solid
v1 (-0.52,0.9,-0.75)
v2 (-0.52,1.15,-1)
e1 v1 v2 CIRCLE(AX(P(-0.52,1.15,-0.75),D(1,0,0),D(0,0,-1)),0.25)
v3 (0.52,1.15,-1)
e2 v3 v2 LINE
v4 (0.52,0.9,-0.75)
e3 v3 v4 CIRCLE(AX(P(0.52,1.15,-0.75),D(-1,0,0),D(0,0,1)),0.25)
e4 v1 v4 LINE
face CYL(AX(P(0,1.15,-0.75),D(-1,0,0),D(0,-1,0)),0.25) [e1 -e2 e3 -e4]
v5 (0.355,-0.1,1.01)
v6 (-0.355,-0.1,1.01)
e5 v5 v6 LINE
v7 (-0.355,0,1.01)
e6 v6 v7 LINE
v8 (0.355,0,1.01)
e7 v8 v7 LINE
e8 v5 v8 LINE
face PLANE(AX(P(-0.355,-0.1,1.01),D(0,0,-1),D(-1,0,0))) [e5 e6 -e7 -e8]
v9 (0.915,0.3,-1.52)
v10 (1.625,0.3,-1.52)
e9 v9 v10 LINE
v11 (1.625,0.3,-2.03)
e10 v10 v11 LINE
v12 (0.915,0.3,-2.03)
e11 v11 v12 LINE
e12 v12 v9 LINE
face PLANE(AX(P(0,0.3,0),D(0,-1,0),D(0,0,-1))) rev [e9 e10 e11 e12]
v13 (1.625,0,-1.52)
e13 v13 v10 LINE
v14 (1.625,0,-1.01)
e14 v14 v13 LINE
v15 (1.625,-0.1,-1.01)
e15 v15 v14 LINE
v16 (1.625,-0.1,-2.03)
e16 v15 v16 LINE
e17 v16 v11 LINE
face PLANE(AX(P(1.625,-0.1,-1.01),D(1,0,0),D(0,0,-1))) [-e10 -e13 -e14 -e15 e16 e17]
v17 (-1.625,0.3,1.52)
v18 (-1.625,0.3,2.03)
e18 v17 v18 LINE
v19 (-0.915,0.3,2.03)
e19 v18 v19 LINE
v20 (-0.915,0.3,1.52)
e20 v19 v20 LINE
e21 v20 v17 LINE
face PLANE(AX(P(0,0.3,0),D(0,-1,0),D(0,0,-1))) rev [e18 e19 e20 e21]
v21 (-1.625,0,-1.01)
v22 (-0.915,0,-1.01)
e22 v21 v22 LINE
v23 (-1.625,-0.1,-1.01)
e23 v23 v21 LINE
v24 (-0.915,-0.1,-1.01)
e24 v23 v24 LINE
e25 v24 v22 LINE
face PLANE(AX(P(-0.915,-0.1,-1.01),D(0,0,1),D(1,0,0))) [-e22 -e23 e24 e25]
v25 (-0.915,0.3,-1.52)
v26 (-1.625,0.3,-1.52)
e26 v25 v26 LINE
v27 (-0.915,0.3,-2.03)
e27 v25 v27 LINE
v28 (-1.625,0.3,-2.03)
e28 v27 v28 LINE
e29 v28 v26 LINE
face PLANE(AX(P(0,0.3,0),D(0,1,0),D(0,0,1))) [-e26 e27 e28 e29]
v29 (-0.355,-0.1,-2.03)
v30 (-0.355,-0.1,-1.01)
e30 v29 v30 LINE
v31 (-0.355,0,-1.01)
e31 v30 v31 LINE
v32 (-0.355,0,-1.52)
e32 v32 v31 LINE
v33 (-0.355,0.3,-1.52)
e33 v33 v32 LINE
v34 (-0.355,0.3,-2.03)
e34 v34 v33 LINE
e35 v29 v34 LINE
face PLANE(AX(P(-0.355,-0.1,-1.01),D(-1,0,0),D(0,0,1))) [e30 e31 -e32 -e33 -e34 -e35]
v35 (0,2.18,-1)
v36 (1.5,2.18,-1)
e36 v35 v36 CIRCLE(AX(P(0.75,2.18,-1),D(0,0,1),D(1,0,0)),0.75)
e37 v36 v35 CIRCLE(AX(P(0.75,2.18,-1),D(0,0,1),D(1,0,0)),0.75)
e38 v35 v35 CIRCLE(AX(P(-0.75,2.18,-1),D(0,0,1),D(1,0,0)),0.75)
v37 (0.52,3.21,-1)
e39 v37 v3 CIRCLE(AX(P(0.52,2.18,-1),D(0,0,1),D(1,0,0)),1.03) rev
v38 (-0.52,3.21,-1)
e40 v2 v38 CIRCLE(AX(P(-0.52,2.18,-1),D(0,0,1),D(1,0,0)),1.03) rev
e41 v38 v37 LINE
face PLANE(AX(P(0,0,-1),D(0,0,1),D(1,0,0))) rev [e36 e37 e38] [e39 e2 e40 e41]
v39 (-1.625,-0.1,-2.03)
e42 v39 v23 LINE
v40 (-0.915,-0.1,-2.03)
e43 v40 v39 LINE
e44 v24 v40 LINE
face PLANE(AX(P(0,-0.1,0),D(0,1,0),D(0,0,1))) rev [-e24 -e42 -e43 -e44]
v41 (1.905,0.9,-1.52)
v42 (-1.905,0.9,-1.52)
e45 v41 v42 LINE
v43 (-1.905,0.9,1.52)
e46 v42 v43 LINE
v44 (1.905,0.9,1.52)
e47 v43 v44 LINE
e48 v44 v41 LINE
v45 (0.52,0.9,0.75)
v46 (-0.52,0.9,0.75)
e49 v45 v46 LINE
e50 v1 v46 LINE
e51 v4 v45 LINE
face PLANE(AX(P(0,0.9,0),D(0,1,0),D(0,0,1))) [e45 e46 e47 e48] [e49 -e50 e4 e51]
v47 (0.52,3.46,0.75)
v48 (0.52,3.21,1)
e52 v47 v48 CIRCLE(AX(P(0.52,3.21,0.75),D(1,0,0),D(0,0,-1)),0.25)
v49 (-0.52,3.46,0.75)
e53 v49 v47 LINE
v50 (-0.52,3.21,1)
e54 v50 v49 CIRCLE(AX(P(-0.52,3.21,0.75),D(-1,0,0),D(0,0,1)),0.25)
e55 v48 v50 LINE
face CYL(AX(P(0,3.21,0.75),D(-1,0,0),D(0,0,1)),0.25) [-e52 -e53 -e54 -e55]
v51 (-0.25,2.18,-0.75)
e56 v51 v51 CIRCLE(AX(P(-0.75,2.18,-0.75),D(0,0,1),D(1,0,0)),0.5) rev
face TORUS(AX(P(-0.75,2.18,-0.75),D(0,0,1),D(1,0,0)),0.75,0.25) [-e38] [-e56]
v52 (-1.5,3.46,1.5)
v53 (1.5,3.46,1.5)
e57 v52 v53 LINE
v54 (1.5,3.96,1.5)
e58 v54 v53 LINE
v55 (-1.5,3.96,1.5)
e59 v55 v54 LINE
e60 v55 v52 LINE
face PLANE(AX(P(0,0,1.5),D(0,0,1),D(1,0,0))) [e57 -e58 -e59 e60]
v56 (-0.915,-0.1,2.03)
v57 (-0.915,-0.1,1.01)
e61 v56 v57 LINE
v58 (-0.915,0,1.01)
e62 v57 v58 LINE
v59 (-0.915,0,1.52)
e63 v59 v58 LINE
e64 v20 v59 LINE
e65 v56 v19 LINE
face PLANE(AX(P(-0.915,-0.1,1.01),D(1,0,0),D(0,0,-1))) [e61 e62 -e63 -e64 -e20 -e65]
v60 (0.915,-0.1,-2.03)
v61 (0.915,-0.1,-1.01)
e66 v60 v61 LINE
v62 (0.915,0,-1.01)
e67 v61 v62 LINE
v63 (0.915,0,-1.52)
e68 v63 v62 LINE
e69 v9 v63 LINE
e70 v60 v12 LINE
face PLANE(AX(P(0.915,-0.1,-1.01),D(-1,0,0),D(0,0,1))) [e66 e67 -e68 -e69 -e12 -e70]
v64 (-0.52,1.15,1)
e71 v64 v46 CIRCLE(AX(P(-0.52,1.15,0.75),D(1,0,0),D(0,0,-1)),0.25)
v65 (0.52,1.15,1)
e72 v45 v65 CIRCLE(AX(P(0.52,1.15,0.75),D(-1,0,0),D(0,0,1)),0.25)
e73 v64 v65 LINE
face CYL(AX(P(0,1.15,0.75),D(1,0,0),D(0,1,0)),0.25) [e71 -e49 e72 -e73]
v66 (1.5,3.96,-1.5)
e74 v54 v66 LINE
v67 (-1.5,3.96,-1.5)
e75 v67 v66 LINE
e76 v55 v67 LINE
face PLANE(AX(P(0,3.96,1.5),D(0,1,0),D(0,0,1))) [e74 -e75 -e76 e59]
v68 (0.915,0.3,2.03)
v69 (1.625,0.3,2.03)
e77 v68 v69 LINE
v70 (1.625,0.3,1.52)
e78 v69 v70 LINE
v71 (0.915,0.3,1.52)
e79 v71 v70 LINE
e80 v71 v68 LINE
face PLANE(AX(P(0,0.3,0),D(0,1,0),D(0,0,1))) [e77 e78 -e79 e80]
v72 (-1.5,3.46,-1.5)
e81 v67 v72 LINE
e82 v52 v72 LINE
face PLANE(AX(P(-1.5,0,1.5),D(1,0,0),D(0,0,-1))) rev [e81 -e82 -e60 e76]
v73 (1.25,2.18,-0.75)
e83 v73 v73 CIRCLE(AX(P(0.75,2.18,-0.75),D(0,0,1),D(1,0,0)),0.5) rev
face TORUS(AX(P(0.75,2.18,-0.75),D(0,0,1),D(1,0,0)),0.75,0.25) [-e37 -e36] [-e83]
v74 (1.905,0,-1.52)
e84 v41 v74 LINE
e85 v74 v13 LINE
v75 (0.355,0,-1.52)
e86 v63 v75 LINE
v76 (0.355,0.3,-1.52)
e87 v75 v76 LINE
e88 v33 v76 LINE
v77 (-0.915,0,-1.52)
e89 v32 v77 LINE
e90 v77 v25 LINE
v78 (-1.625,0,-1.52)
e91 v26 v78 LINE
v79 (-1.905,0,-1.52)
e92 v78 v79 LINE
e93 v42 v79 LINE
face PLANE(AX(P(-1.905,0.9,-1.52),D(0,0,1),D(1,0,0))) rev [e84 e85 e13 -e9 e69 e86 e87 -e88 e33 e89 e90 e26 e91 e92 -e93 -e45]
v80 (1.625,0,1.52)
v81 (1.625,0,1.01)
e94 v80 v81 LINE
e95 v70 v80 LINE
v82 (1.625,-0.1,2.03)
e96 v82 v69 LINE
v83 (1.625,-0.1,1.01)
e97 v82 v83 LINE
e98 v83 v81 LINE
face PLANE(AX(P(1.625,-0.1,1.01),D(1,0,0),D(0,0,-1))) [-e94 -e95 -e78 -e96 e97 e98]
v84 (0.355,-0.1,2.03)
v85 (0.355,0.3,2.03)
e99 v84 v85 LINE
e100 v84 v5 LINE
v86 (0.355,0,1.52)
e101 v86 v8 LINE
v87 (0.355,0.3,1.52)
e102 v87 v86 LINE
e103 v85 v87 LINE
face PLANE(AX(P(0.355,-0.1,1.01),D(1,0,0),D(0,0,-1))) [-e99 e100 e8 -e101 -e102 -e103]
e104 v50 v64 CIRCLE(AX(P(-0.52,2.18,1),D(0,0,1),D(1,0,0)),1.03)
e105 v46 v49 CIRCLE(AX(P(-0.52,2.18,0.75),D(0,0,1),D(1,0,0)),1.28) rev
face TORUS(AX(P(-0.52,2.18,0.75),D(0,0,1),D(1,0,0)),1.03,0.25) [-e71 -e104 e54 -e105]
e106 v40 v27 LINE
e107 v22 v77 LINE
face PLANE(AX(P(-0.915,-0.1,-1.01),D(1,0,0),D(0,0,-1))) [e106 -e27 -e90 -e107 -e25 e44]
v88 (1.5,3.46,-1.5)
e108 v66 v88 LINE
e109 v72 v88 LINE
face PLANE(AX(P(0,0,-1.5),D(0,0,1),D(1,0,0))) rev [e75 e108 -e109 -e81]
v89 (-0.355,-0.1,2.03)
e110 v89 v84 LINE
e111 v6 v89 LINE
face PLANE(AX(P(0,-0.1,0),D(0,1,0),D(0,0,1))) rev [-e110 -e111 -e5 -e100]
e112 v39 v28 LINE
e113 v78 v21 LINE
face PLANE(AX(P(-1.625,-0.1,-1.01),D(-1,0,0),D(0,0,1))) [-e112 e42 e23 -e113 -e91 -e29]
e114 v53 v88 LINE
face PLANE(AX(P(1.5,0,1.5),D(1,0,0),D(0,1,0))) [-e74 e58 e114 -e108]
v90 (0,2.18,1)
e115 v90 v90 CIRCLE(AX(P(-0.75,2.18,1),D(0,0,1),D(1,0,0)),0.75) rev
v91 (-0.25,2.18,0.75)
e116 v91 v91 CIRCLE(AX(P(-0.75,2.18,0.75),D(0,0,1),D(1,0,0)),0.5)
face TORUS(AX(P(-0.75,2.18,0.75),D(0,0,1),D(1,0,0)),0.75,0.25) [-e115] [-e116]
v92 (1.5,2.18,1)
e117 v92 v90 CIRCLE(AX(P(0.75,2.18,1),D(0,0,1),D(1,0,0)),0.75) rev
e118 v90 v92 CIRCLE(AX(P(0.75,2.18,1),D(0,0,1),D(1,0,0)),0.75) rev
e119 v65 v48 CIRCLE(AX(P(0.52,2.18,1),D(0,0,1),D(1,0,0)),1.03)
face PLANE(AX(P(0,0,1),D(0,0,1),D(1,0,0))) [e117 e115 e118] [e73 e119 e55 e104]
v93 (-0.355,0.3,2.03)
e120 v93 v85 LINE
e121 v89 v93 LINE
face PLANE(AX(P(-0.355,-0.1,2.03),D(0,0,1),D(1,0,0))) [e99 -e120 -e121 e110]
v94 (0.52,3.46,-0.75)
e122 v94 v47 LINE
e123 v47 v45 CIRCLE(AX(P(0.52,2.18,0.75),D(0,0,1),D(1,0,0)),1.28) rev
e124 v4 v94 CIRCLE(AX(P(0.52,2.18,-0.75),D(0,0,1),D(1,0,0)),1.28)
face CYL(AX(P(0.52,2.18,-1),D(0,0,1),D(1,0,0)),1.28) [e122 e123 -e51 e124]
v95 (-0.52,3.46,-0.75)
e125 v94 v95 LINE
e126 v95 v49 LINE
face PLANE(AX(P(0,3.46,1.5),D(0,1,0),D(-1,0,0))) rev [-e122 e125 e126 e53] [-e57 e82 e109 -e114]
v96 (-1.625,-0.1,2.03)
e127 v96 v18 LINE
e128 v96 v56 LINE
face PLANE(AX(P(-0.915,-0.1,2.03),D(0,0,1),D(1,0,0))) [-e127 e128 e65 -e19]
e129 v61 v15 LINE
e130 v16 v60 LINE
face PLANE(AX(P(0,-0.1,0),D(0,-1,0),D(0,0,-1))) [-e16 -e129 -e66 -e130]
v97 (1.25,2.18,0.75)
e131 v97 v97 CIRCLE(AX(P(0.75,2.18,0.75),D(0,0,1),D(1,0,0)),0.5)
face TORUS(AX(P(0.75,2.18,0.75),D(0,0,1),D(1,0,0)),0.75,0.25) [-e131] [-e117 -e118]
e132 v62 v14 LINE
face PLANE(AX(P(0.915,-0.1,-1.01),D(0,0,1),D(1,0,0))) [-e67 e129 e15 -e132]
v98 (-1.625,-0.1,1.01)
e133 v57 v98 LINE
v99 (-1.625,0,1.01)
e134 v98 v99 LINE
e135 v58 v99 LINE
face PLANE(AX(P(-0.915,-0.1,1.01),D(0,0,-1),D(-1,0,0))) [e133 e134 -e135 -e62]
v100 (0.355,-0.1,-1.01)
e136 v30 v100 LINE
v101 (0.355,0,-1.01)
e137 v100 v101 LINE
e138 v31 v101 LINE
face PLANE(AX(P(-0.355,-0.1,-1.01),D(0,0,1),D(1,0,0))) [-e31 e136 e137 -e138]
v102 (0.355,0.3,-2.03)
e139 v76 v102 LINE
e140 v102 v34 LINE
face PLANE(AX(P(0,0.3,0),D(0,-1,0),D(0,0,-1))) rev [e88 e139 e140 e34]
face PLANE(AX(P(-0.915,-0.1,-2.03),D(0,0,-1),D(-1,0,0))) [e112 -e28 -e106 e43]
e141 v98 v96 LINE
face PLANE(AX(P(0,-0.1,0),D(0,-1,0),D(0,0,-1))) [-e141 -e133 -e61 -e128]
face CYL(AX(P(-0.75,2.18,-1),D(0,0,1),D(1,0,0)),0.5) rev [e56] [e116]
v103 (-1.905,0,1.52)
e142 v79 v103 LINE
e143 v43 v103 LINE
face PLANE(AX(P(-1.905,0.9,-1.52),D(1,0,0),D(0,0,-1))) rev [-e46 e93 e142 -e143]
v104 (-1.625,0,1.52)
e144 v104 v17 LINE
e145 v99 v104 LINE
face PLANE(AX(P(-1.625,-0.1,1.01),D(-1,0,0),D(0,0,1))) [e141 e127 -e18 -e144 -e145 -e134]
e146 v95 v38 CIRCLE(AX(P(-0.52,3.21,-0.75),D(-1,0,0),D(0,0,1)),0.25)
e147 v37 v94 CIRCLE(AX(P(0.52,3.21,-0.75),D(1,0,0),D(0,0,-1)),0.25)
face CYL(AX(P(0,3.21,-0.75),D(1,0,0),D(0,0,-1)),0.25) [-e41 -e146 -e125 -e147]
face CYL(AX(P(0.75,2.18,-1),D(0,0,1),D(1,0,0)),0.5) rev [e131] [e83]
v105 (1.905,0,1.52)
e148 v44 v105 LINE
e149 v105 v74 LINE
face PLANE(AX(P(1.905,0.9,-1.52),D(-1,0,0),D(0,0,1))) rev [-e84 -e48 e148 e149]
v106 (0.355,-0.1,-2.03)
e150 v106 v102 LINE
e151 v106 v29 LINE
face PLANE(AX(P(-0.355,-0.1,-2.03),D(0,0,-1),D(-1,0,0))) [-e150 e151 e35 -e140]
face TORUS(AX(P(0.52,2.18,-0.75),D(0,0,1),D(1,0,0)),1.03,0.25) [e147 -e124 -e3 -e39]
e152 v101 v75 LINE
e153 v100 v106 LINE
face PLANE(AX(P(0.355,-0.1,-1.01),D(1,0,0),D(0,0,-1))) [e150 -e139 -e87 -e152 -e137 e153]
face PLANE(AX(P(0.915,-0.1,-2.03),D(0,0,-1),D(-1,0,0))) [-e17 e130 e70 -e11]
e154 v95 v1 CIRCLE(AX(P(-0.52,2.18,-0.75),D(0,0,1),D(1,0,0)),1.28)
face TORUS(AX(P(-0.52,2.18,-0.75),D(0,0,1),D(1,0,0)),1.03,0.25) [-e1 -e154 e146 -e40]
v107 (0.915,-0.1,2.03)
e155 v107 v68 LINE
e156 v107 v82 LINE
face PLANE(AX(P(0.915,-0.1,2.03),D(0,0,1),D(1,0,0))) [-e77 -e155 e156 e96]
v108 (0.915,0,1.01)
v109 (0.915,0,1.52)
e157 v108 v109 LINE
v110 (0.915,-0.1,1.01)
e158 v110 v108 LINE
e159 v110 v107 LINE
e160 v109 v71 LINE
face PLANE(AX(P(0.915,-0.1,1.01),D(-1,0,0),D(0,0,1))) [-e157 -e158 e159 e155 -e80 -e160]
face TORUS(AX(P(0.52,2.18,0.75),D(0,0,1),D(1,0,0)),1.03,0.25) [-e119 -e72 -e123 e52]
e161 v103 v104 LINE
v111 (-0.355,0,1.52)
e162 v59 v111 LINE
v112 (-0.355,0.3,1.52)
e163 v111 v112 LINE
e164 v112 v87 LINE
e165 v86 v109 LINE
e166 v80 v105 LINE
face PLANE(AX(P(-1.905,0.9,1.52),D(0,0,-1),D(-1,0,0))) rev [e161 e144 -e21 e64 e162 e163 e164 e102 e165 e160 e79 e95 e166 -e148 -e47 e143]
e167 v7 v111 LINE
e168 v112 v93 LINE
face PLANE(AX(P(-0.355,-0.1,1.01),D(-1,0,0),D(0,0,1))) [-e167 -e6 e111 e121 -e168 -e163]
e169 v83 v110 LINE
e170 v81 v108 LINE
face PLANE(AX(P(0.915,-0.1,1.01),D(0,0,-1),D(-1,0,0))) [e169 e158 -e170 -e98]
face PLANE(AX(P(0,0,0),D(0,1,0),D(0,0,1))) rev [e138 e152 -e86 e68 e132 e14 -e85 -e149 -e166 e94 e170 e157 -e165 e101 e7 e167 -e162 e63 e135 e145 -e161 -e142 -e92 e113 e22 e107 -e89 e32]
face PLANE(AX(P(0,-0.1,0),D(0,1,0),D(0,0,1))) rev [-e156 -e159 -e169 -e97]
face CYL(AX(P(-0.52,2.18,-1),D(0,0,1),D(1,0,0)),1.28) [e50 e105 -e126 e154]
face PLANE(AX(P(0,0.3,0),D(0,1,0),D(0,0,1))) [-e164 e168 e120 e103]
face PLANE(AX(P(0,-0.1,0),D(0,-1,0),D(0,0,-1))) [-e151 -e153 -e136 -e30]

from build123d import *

# Parameters (mm, degrees)
SKETCH_1_W           = 3.81
SKETCH_1_H           = 3.04
EXTRUDE_1_DEPTH      = 0.9
EXTRUDE_2_DEPTH      = 0.3
EXTRUDE_2_DEPTH_BACK = 0.1
SKETCH_2_W           = 0.71
SKETCH_2_H           = 1.02
SKETCH_3_R           = 0.5
EXTRUDE_3_DEPTH      = 1
EXTRUDE_4_DEPTH      = 1.5
FILLET_2_R           = 0.25


with BuildPart() as part:
    # Эскиз1 → Бобышка-Вытянуть1 (new body)
    with BuildSketch(Plane(origin=(0, 0, 0), x_dir=(1, 0, 0), z_dir=(0, 1, 0))):
        Rectangle(SKETCH_1_W, SKETCH_1_H)
    extrude(amount=EXTRUDE_1_DEPTH)

    # Эскиз2 → Бобышка-Вытянуть2 (add, two sides: drawn at the far end of the back side and taken through both)
    with BuildSketch(Plane(origin=(0, 0, 0), x_dir=(1, 0, 0), z_dir=(0, 1, 0)).offset(-EXTRUDE_2_DEPTH_BACK)):
        with Locations((1.27, -1.52)):
            Rectangle(SKETCH_2_W, SKETCH_2_H)
        with Locations((0, -1.52)):
            Rectangle(SKETCH_2_W, SKETCH_2_H)
        with Locations((-1.27, -1.52)):
            Rectangle(SKETCH_2_W, SKETCH_2_H)
        with Locations((-1.27, 1.52)):
            Rectangle(SKETCH_2_W, SKETCH_2_H)
        with Locations((0, 1.52)):
            Rectangle(SKETCH_2_W, SKETCH_2_H)
        with Locations((1.27, 1.52)):
            Rectangle(SKETCH_2_W, SKETCH_2_H)
    extrude(amount=EXTRUDE_2_DEPTH + EXTRUDE_2_DEPTH_BACK)


with BuildPart() as body_2:
    # Эскиз3 → Бобышка-Вытянуть3 (new, symmetric)
    with BuildSketch(Plane.XY):
        with BuildLine():
            Line((0.52, 3.46), (-0.52, 3.46))
            ThreePointArc((-0.52, 3.46), (-1.8, 2.18), (-0.52, 0.9))
            Line((-0.52, 0.9), (0.52, 0.9))
            ThreePointArc((0.52, 0.9), (1.8, 2.18), (0.52, 3.46))
        make_face()
        with Locations((-0.75, 2.18)):
            Circle(SKETCH_3_R, mode=Mode.SUBTRACT)
        with Locations((0.75, 2.18)):
            Circle(SKETCH_3_R, mode=Mode.SUBTRACT)
    extrude(amount=EXTRUDE_3_DEPTH, both=True)

    # Скругление2
    fillet_2_edges = [body_2.edges().sort_by_distance(p)[0] for p in [
        (0, 0.9, 1),
        (1.8, 2.18, -1),
        (0, 3.46, -1),
        (-1.8, 2.18, -1),
        (0.25, 2.18, -1),
        (-1.25, 2.18, -1),
        (0, 0.9, -1),
        (-1.25, 2.18, 1),
        (0.25, 2.18, 1),
        (-1.8, 2.18, 1),
        (0, 3.46, 1),
        (1.8, 2.18, 1),
    ]]
    fillet(fillet_2_edges, radius=FILLET_2_R - 0.0001)  # a hair under: the kernel refuses the full size


with BuildPart() as body_3:
    # Эскиз3<3> → Бобышка-Вытянуть4 (new, symmetric)
    with BuildSketch(Plane.XY):
        Polygon((-1.5, 3.46), (-0.52, 3.46), (0.52, 3.46), (1.5, 3.46), (1.5, 3.96), (-1.5, 3.96), align=None)
    extrude(amount=EXTRUDE_4_DEPTH, both=True)


with BuildPart() as part_1:
    add(part.part)

    # Combine 1: union body 2, body 3
    add(body_2.part)
    add(body_3.part)


solid = part_1.part
